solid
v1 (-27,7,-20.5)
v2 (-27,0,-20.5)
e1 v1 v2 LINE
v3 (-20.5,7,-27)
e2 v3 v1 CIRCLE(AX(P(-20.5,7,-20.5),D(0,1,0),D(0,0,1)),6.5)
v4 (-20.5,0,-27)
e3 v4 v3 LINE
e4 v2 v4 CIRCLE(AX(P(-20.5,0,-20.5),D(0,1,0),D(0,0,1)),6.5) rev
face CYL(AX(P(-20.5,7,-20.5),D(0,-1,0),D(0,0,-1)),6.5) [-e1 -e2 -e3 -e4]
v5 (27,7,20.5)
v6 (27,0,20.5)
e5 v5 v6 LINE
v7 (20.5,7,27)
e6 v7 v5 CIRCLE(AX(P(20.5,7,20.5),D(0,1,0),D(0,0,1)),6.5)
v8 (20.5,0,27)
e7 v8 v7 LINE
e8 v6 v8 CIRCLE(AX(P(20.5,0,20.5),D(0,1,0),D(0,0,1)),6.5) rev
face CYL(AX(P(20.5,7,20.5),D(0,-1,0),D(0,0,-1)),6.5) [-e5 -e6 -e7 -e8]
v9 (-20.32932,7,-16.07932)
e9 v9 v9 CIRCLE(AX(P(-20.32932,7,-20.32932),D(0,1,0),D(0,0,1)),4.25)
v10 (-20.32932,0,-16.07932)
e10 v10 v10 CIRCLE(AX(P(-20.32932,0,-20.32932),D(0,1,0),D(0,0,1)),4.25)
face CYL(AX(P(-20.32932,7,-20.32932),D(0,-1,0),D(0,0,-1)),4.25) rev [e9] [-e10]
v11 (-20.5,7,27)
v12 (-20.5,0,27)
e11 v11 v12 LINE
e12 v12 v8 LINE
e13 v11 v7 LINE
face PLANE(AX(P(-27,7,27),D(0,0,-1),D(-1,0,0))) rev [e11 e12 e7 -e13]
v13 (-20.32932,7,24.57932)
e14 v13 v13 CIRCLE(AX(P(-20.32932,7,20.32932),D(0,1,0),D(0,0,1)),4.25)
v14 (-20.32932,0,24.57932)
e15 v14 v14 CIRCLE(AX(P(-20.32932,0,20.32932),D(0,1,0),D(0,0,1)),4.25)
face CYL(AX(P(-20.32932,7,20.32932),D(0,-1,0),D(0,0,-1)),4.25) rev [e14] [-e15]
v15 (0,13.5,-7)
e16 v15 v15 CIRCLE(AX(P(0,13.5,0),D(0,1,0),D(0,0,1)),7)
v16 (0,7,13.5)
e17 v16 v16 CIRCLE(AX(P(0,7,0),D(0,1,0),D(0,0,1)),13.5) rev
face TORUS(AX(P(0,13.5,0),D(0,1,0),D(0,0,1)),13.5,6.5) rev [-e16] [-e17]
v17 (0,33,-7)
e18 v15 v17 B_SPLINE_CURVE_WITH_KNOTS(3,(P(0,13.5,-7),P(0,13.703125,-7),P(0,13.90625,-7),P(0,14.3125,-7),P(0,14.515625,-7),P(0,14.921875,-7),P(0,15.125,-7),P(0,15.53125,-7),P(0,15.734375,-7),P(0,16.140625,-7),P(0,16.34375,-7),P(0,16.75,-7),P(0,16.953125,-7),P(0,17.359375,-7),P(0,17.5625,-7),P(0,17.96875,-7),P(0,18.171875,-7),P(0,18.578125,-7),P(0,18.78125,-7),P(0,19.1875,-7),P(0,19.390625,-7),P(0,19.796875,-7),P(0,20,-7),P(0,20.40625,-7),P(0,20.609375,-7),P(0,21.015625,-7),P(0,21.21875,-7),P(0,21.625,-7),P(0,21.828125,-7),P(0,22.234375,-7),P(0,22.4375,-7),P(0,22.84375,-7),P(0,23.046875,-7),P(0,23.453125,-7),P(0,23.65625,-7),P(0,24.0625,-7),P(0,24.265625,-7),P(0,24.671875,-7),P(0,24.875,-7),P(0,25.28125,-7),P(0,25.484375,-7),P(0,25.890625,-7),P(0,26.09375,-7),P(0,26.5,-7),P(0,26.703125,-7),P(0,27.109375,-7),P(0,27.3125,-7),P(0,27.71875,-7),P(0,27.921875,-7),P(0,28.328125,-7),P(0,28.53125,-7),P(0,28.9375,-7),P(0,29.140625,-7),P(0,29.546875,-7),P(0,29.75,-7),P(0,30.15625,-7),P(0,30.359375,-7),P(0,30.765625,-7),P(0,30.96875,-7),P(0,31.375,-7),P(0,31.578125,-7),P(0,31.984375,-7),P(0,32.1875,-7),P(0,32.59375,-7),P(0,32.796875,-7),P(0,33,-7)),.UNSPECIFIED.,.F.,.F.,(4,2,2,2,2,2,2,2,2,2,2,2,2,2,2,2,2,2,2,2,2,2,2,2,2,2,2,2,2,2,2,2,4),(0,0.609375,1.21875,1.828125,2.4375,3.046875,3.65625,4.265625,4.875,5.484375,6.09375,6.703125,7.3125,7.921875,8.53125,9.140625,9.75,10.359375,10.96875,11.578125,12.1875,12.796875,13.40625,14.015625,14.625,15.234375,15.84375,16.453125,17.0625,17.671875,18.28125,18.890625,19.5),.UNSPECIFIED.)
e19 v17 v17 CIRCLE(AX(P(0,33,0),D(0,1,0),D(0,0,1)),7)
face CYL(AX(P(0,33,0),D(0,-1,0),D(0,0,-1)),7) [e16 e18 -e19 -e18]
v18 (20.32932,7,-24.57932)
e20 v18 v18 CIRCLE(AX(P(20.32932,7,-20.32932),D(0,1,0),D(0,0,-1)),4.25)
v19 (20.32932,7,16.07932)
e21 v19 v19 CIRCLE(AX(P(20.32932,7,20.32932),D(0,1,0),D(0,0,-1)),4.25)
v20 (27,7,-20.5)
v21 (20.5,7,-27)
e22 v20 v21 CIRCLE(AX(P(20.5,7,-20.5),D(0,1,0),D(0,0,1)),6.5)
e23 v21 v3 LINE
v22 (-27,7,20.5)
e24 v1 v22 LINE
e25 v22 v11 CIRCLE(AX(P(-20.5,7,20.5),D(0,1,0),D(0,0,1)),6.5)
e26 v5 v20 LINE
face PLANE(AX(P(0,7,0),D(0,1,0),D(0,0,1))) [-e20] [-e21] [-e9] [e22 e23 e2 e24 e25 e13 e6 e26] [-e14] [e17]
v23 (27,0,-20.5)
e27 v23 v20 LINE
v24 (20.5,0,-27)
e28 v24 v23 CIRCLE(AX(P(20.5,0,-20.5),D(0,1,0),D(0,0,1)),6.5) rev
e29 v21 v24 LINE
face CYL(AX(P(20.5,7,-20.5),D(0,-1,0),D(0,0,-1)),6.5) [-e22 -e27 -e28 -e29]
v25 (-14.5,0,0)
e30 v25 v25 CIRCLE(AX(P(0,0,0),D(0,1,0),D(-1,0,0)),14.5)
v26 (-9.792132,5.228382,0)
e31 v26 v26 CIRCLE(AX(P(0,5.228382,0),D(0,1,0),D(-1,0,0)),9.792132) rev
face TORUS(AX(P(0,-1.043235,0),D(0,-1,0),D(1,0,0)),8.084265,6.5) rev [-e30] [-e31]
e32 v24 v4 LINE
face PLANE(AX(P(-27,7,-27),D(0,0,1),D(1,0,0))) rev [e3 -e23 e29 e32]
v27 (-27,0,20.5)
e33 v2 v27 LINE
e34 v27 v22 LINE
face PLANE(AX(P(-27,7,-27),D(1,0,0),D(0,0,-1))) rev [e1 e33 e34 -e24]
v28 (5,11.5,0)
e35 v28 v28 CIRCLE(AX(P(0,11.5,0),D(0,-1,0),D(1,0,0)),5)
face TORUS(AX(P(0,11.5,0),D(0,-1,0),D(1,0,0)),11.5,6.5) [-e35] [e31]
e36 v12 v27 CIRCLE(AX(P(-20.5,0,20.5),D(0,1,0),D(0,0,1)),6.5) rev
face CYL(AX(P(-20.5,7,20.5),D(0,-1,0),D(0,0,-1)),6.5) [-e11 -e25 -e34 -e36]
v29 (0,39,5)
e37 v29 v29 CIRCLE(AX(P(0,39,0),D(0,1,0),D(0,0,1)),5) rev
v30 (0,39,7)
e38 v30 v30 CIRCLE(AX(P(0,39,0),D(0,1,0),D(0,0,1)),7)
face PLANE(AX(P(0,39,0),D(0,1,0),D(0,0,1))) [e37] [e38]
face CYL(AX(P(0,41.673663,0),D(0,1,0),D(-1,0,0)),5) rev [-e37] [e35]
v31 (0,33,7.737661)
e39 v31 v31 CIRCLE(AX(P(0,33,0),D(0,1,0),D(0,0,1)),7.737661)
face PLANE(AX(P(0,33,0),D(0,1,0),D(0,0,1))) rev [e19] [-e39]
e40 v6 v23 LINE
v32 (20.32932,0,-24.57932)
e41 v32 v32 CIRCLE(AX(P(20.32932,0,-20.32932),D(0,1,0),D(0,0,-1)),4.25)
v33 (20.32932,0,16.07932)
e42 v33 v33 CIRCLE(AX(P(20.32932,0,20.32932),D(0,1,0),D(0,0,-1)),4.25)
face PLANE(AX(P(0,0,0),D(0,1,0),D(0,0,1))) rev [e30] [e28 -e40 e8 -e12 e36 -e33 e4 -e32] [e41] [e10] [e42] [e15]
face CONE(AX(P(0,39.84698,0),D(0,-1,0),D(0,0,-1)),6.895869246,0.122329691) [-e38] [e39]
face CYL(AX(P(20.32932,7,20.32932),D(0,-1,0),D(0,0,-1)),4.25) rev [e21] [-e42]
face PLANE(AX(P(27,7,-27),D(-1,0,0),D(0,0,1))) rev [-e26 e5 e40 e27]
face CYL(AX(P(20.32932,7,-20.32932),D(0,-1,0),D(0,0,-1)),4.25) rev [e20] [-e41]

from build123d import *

# Parameters (mm, degrees)
SKETCH1_R           = 4.250000000000005
SKETCH1_R_2         = 4.250000000000013
SKETCH1_R_3         = 4.2500000000000036
BOSS_EXTRUDE1_DEPTH = 7
FILLET2_R           = 6.5
SKETCH4_R           = 7
BOSS_EXTRUDE3_DEPTH = 26
SKETCH5_R           = 7.75
BOSS_EXTRUDE4_DEPTH = 6
FILLET3_R           = 6.5
FILLET4_R           = 6.5
FILLET5_R           = 6.5


with BuildPart() as part:
    # Sketch1 → Boss-Extrude1 (new body)
    with BuildSketch(Plane(origin=(0, 0, 0), x_dir=(1, 0, 0), z_dir=(0, 1, 0))):
        Polygon((-27, 27), (27, 27), (27.000000000000007, -27), (-26.999999999999993, -27), align=None)
        with Locations(Location((-20.329319959113246, 20.329319959113246, 0), (0, 0, 270))):
            Circle(SKETCH1_R, mode=Mode.SUBTRACT)
        with Locations(Location((20.32931995911324, -20.329319959113246, 0), (0, 0, 90))):
            Circle(SKETCH1_R_2, mode=Mode.SUBTRACT)
        with Locations(Location((-20.329319959113224, -20.329319959113246, 0), (0, 0, 270))):
            Circle(SKETCH1_R_2, mode=Mode.SUBTRACT)
        with Locations(Location((20.329319959113246, 20.329319959113253, 0), (0, 0, 90))):
            Circle(SKETCH1_R_3, mode=Mode.SUBTRACT)
    extrude(amount=BOSS_EXTRUDE1_DEPTH)

    # Fillet2
    fillet2_edges = [part.edges().sort_by_distance(p)[0] for p in [
        (27.000000000000007, 3.5, 27),
        (-26.999999999999993, 3.5, 27),
        (-27, 3.5, -27),
        (27, 3.5, -27),
    ]]
    fillet(fillet2_edges, radius=FILLET2_R)

    # Sketch4 → Boss-Extrude3 (add)
    with BuildSketch(Plane(origin=(0, 7, 0), x_dir=(1, 0, 0), z_dir=(0, 1, 0))):
        with Locations(Location((0, 0, 0), (0, 0, 90))):
            Circle(SKETCH4_R)
    extrude(amount=BOSS_EXTRUDE3_DEPTH)

    # Sketch5 → Boss-Extrude4 (add)
    with BuildSketch(Plane(origin=(0, 33, 0), x_dir=(1, 0, 0), z_dir=(0, 1, 0))):
        with Locations(Location((0, 0, 0), (0, 0, 270))):
            Circle(SKETCH5_R)
    extrude(amount=BOSS_EXTRUDE4_DEPTH)

    # Sketch6 → Cut-Revolve1 (revolve, cut)
    with BuildSketch(Plane.XY, mode=Mode.PRIVATE) as cut_revolve1_sk:
        Polygon((6.8958692457127615, 39.84698008319777), (7.935722009021632, 31.389012156149754), (8.514556179291803, 31.389012156149754), (8.514556179291803, 39.84698008319777), align=None)
    revolve(cut_revolve1_sk.sketch.rotate(Axis((0, 39, 0), (0, -1, 0)), 90), axis=Axis((0, 39, 0), (0, -1, 0)), mode=Mode.SUBTRACT)

    # Fillet3
    fillet3_edges = [part.edges().sort_by_distance(p)[0] for p in [
        (-1.29e-15, 7, 7),
    ]]
    fillet(fillet3_edges, radius=FILLET3_R)

    # Sketch7 → Cut-Revolve2 (revolve, cut)
    with BuildSketch(Plane.XY, mode=Mode.PRIVATE) as cut_revolve2_sk:
        Polygon((4.999999999999997, 41.673662522697256), (5.000000000000003, 4.999999999999999), (14.500000000000009, 5), (14.50000000000001, 1.128e-14), (0, -2.109667236724723), (1.73e-15, 41.673662522697256), align=None)
    revolve(cut_revolve2_sk.sketch.rotate(Axis((1.73e-15, 41.673662522697256, 0), (-4e-17, -1, 0)), 180), axis=Axis((1.73e-15, 41.673662522697256, 0), (-4e-17, -1, 0)), mode=Mode.SUBTRACT)

    # Fillet4
    fillet4_edges = [part.edges().sort_by_distance(p)[0] for p in [
        (5.000000000000003, 5, -1.22e-15),
    ]]
    fillet(fillet4_edges, radius=FILLET4_R)

    # Fillet5
    # the kernel refuses this fillet: 6.5 mm, written as the material it adds along each edge
    with BuildSketch(Plane(origin=(2.8e-16, 5, 0), x_dir=(-1, 6e-17, 1.2e-16), z_dir=(1.2e-16, 0, 1))) as fillet5_piece_1:
        with BuildLine():
            CenterArc((8.084264649295068, 6.043235308880427), FILLET5_R, 285.23323327747323, 65.5309787307709)
            Line((14.500000000001535, 4.999999999999738), (15.141573535072181, 4.895676469111669))
            ThreePointArc((15.141573535072181, 4.895676469111669), (15.15000000000001, 2.499999999999869), (15.15000000000001, 4e-17))
            Line((15.15000000000001, 4e-17), (14.500000000000009, -0.6500000000000004))
            ThreePointArc((14.500000000000009, -0.6500000000000004), (11.499999999999995, -0.6500000000000006), (9.962919092182778, -0.8555441110038083))
            Line((9.962919092182778, -0.8555441110038083), (9.792132324647532, -0.22838234555978715))
        make_face()
    revolve(axis=Axis((2.8e-16, 5, 0), (-4e-17, -1, 0)))


solid = part.part
